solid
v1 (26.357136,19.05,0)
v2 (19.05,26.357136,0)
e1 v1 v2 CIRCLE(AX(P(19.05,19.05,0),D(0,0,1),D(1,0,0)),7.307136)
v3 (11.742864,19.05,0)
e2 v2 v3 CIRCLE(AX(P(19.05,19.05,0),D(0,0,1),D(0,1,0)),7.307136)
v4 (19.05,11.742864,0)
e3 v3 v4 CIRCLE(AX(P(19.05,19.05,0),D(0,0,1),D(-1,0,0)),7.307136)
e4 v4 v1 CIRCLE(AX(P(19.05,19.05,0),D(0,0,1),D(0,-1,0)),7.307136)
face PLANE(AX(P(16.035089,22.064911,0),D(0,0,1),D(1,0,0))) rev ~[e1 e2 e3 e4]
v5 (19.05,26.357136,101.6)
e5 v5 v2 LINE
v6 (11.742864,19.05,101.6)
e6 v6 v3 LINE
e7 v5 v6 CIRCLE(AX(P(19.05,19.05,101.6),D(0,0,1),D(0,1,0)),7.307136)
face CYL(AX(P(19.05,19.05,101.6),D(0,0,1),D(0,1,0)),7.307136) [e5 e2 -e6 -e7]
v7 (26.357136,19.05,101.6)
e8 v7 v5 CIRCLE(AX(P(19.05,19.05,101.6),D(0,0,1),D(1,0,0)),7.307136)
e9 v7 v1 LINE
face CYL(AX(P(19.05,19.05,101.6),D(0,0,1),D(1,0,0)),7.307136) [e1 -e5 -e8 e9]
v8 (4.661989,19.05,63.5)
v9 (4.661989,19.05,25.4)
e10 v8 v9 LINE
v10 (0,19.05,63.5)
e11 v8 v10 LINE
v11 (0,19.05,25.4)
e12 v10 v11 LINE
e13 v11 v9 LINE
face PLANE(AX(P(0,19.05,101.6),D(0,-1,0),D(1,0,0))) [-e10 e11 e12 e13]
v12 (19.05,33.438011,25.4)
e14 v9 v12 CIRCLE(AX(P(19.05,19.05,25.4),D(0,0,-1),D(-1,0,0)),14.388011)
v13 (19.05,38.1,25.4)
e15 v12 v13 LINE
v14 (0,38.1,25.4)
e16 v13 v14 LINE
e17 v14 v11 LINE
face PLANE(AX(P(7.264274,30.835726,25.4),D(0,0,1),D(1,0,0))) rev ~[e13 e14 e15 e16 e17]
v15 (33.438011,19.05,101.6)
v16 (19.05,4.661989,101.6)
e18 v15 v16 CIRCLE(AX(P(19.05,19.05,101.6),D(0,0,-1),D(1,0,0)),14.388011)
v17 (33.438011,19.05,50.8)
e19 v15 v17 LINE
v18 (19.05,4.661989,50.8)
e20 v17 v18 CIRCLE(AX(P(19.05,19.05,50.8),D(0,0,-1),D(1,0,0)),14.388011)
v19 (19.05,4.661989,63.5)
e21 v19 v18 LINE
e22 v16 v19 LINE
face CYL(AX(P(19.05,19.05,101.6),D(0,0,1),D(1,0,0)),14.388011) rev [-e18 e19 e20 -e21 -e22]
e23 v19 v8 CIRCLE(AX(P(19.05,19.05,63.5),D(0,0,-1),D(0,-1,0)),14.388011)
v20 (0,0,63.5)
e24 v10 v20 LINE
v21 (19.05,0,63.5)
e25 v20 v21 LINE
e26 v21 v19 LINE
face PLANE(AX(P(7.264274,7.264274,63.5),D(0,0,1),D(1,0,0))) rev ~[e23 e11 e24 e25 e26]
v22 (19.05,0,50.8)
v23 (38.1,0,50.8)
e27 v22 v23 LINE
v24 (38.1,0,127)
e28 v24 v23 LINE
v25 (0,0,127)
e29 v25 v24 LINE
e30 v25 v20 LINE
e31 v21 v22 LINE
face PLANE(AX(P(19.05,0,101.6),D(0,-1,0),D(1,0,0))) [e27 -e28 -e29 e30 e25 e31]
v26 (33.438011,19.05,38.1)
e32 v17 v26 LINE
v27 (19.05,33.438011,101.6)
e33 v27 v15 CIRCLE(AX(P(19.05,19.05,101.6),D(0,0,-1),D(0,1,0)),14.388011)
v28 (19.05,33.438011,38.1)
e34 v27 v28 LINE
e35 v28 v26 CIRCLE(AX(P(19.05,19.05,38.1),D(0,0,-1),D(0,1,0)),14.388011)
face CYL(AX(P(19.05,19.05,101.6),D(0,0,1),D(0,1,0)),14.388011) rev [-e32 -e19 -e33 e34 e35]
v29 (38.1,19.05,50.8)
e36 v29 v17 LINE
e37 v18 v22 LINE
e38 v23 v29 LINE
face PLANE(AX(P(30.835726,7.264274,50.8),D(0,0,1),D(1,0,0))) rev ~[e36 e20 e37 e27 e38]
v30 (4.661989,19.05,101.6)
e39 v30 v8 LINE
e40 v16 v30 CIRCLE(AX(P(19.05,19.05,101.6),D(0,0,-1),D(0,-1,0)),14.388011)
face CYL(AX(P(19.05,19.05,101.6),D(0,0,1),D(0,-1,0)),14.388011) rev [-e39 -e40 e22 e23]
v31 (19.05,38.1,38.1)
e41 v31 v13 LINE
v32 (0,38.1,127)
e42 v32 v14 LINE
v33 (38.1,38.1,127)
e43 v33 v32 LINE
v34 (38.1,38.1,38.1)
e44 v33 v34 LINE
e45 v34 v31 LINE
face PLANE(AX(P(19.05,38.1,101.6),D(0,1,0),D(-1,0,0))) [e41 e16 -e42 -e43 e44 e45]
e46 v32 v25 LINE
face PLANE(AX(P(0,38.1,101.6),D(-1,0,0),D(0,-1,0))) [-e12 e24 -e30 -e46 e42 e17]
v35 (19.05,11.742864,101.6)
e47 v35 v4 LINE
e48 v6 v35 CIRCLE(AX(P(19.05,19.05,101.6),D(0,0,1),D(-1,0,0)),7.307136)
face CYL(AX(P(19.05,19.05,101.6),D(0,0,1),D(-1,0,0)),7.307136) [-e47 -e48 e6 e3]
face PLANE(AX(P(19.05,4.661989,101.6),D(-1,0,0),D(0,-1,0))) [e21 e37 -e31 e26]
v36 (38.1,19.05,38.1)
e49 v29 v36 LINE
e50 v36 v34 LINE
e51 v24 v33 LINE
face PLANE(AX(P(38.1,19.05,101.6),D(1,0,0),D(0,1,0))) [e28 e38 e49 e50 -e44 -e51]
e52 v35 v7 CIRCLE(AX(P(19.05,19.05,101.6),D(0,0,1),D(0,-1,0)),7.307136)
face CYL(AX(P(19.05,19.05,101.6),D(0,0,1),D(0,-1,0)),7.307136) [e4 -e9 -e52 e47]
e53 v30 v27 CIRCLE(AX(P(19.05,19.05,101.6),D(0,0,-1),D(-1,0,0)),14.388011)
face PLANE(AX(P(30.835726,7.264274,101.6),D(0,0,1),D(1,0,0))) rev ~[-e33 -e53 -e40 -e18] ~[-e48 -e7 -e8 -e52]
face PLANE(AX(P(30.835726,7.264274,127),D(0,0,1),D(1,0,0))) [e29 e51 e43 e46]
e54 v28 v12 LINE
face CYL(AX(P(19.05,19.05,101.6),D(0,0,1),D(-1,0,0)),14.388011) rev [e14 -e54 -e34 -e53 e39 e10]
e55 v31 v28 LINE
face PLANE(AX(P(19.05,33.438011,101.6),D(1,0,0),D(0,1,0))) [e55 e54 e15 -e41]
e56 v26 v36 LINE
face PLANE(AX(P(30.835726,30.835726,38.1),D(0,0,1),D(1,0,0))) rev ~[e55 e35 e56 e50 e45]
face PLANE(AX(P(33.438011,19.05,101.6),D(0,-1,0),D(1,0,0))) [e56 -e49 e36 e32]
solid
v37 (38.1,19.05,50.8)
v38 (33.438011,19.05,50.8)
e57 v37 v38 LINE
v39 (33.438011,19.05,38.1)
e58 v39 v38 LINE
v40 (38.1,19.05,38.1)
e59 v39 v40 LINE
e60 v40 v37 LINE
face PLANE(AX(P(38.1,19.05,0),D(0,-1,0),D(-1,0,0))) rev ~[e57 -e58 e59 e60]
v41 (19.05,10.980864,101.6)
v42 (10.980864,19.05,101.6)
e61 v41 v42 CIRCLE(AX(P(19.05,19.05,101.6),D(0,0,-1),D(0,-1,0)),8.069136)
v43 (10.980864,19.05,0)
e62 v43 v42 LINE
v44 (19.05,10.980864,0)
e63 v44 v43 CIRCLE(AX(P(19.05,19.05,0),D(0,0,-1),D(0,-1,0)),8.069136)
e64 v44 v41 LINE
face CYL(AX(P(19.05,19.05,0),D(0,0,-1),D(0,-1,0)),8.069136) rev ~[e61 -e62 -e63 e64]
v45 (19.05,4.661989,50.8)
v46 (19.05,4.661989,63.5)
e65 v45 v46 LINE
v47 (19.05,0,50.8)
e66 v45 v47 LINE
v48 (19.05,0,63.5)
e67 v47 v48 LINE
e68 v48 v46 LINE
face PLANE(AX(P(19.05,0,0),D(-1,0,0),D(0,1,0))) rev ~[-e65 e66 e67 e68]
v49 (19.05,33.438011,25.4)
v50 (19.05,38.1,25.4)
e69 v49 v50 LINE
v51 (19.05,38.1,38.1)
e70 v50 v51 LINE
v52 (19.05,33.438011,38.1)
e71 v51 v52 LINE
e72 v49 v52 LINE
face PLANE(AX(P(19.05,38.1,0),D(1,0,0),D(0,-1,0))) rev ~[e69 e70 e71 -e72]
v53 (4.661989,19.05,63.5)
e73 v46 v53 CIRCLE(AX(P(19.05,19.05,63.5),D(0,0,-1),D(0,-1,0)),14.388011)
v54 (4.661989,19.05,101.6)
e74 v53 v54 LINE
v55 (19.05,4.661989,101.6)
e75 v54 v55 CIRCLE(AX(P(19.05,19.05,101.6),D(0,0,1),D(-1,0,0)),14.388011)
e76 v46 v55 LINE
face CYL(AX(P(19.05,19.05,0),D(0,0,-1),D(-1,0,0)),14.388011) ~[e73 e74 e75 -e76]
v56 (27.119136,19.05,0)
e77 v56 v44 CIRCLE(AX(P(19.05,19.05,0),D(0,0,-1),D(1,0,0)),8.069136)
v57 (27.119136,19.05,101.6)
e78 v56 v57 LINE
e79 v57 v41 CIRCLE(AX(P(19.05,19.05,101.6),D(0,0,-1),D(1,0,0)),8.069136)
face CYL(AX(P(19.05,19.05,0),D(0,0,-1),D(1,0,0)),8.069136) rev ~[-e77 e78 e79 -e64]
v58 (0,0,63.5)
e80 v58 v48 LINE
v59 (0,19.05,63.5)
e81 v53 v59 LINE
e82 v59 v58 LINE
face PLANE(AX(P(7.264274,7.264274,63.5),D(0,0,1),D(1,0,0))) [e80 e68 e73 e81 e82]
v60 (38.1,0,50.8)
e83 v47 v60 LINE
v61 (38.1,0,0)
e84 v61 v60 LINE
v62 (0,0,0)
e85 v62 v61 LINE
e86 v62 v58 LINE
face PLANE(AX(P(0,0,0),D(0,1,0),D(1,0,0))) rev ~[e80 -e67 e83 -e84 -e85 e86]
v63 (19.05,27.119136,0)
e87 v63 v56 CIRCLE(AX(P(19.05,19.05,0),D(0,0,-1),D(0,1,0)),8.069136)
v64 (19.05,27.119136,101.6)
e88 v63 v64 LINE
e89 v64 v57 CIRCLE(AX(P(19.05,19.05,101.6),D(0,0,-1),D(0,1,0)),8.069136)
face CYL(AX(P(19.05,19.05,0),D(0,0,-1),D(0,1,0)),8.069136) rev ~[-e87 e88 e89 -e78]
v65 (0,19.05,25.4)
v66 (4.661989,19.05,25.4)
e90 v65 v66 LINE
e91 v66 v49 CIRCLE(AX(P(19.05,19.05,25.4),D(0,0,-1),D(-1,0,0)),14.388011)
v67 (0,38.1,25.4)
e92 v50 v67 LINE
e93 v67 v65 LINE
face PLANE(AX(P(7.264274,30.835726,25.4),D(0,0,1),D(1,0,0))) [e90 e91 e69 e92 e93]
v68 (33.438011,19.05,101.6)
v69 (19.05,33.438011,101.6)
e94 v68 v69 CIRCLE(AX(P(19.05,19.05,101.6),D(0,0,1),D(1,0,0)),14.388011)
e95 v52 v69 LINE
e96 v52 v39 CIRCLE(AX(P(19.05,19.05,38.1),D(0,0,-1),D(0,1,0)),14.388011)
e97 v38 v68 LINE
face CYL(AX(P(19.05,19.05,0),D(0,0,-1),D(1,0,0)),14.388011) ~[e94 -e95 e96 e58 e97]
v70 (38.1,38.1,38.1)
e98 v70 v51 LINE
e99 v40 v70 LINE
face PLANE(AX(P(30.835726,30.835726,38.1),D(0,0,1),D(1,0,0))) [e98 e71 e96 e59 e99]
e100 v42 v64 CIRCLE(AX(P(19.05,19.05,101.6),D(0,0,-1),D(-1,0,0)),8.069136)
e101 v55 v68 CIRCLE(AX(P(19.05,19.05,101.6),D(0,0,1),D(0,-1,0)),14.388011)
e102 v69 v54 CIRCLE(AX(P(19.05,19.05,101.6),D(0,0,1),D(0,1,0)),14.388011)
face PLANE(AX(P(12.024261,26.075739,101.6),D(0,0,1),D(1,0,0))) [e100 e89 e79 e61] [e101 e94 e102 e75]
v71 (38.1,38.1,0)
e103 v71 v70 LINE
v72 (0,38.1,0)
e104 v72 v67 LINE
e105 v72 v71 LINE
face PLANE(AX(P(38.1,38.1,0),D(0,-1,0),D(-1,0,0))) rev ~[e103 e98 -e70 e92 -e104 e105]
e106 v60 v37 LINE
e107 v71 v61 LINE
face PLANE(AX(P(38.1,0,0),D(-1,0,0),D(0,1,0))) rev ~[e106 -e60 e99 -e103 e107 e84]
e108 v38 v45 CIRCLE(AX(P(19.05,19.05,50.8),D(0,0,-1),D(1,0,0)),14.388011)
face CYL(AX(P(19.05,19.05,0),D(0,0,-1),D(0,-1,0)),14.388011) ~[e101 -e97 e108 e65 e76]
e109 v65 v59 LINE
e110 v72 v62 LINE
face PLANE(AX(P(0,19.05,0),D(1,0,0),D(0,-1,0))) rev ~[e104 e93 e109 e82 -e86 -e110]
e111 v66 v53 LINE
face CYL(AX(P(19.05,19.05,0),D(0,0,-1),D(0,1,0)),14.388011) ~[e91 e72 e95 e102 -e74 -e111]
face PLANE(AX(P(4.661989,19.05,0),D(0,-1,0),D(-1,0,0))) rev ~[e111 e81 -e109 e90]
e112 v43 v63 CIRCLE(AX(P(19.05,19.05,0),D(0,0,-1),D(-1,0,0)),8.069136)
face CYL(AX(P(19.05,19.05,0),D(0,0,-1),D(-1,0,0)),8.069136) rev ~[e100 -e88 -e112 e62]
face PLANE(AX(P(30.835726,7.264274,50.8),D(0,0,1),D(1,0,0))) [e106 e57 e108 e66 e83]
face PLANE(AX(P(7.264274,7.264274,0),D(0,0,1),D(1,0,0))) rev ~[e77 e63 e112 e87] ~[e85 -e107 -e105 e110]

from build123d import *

# Parameters (mm, degrees)
F1_DEPTH  = 25.4
F2_DEPTH  = 38.1
F3_DEPTH  = 50.8
F4_DEPTH  = 63.5
F5_DEPTH  = 101.6
F7_DEPTH  = 101.6
F8_DEPTH  = 25.4
F9_DEPTH  = 38.1
F10_DEPTH = 50.8
F11_DEPTH = 63.5
F12_DEPTH = 76.2


with BuildPart() as f1:
    # F0 (on Top) → F1 (new body)
    with BuildSketch(Plane.XY):
        with BuildLine():
            Line((0, 38.1), (0, 19.05))
            Line((0, 19.05), (4.6619887504, 19.05))
            ThreePointArc((4.6619887504, 19.05), (8.8761396776, 29.2238603224), (19.05, 33.4380112496))
            Line((19.05, 33.4380112496), (19.05, 38.1))
            Line((19.05, 38.1), (0, 38.1))
        make_face()
    extrude(amount=F1_DEPTH)

    # F0 (on Top) → F2 (join)
    with BuildSketch(Plane.XY):
        with BuildLine():
            Line((33.4380112496, 19.05), (38.1, 19.05))
            Line((38.1, 19.05), (38.1, 38.1))
            Line((38.1, 38.1), (19.05, 38.1))
            Line((19.05, 38.1), (19.05, 33.4380112496))
            ThreePointArc((19.05, 33.4380112496), (29.2238603224, 29.2238603224), (33.4380112496, 19.05))
        make_face()
    extrude(amount=F2_DEPTH)

    # F0 (on Top) → F3 (join)
    with BuildSketch(Plane.XY):
        with BuildLine():
            Line((19.05, 4.6619887504), (19.05, 0))
            Line((19.05, 0), (38.1, 0))
            Line((38.1, 0), (38.1, 19.05))
            Line((38.1, 19.05), (33.4380112496, 19.05))
            ThreePointArc((33.4380112496, 19.05), (29.2238603224, 8.8761396776), (19.05, 4.6619887504))
        make_face()
    extrude(amount=F3_DEPTH)

    # F0 (on Top) → F4 (join)
    with BuildSketch(Plane.XY):
        with BuildLine():
            Line((0, 19.05), (0, 0))
            Line((0, 0), (19.05, 0))
            Line((19.05, 0), (19.05, 4.6619887504))
            ThreePointArc((19.05, 4.6619887504), (8.8761396776, 8.8761396776), (4.6619887504, 19.05))
            Line((4.6619887504, 19.05), (0, 19.05))
        make_face()
    extrude(amount=F4_DEPTH)

    # F0 (on Top) → F5 (join)
    with BuildSketch(Plane.XY):
        with BuildLine():
            ThreePointArc((19.05, 33.4380112496), (8.8761396776, 29.2238603224), (4.6619887504, 19.05))
            Line((4.6619887504, 19.05), (10.9808641353, 19.05))
            ThreePointArc((10.9808641353, 19.05), (13.3442593118, 24.7557406882), (19.05, 27.1191358647))
            Line((19.05, 27.1191358647), (19.05, 33.4380112496))
        make_face()
        with BuildLine():
            Line((27.1191358647, 19.05), (33.4380112496, 19.05))
            ThreePointArc((33.4380112496, 19.05), (29.2238603224, 29.2238603224), (19.05, 33.4380112496))
            Line((19.05, 33.4380112496), (19.05, 27.1191358647))
            ThreePointArc((19.05, 27.1191358647), (24.7557406882, 24.7557406882), (27.1191358647, 19.05))
        make_face()
        with BuildLine():
            Line((19.05, 10.9808641353), (19.05, 4.6619887504))
            ThreePointArc((19.05, 4.6619887504), (29.2238603224, 8.8761396776), (33.4380112496, 19.05))
            Line((33.4380112496, 19.05), (27.1191358647, 19.05))
            ThreePointArc((27.1191358647, 19.05), (24.7557406882, 13.3442593118), (19.05, 10.9808641353))
        make_face()
        with BuildLine():
            ThreePointArc((4.6619887504, 19.05), (8.8761396776, 8.8761396776), (19.05, 4.6619887504))
            Line((19.05, 4.6619887504), (19.05, 10.9808641353))
            ThreePointArc((19.05, 10.9808641353), (13.3442593118, 13.3442593118), (10.9808641353, 19.05))
            Line((10.9808641353, 19.05), (4.6619887504, 19.05))
        make_face()
    extrude(amount=F5_DEPTH)


with BuildPart() as f7:
    # F6 (on face) → F7 (new body, through all)
    with BuildSketch(Plane.XY.offset(101.6)):
        with BuildLine():
            Line((19.05, 19.05), (19.05, 26.3571361959))
            ThreePointArc((19.05, 26.3571361959), (13.8830744448, 24.2169255552), (11.7428638041, 19.05))
            Line((11.7428638041, 19.05), (19.05, 19.05))
        make_face()
        with BuildLine():
            Line((19.05, 19.05), (26.3571361959, 19.05))
            ThreePointArc((26.3571361959, 19.05), (24.2169255552, 24.2169255552), (19.05, 26.3571361959))
            Line((19.05, 26.3571361959), (19.05, 19.05))
        make_face()
        with BuildLine():
            ThreePointArc((11.7428638041, 19.05), (13.8830744448, 13.8830744448), (19.05, 11.7428638041))
            Line((19.05, 11.7428638041), (19.05, 19.05))
            Line((19.05, 19.05), (11.7428638041, 19.05))
        make_face()
        with BuildLine():
            ThreePointArc((19.05, 11.7428638041), (24.2169255552, 13.8830744448), (26.3571361959, 19.05))
            Line((26.3571361959, 19.05), (19.05, 19.05))
            Line((19.05, 19.05), (19.05, 11.7428638041))
        make_face()
    extrude(amount=-F7_DEPTH)

    # F6 (on face) → F8 (join)
    with BuildSketch(Plane.XY.offset(101.6)):
        with BuildLine():
            Line((38.1, 19.05), (33.4380112496, 19.05))
            ThreePointArc((33.4380112496, 19.05), (29.2238603224, 8.8761396776), (19.05, 4.6619887504))
            Line((19.05, 4.6619887504), (19.05, 0))
            Line((19.05, 0), (38.1, 0))
            Line((38.1, 0), (38.1, 19.05))
        make_face()
        with BuildLine():
            ThreePointArc((19.05, 4.6619887504), (29.2238603224, 8.8761396776), (33.4380112496, 19.05))
            Line((33.4380112496, 19.05), (27.1191358647, 19.05))
            ThreePointArc((27.1191358647, 19.05), (24.7557406882, 13.3442593118), (19.05, 10.9808641353))
            Line((19.05, 10.9808641353), (19.05, 4.6619887504))
        make_face()
        with BuildLine():
            ThreePointArc((19.05, 10.9808641353), (24.7557406882, 13.3442593118), (27.1191358647, 19.05))
            Line((27.1191358647, 19.05), (26.3571361959, 19.05))
            ThreePointArc((26.3571361959, 19.05), (24.2169255552, 13.8830744448), (19.05, 11.7428638041))
            Line((19.05, 11.7428638041), (19.05, 10.9808641353))
        make_face()
        with BuildLine():
            ThreePointArc((19.05, 11.7428638041), (24.2169255552, 13.8830744448), (26.3571361959, 19.05))
            Line((26.3571361959, 19.05), (19.05, 19.05))
            Line((19.05, 19.05), (19.05, 11.7428638041))
        make_face()
        with BuildLine():
            ThreePointArc((11.7428638041, 19.05), (13.8830744448, 13.8830744448), (19.05, 11.7428638041))
            Line((19.05, 11.7428638041), (19.05, 19.05))
            Line((19.05, 19.05), (11.7428638041, 19.05))
        make_face()
        with BuildLine():
            ThreePointArc((10.9808641353, 19.05), (13.3442593118, 13.3442593118), (19.05, 10.9808641353))
            Line((19.05, 10.9808641353), (19.05, 11.7428638041))
            ThreePointArc((19.05, 11.7428638041), (13.8830744448, 13.8830744448), (11.7428638041, 19.05))
            Line((11.7428638041, 19.05), (10.9808641353, 19.05))
        make_face()
        with BuildLine():
            ThreePointArc((4.6619887504, 19.05), (8.8761396776, 8.8761396776), (19.05, 4.6619887504))
            Line((19.05, 4.6619887504), (19.05, 10.9808641353))
            ThreePointArc((19.05, 10.9808641353), (13.3442593118, 13.3442593118), (10.9808641353, 19.05))
            Line((10.9808641353, 19.05), (4.6619887504, 19.05))
        make_face()
        with BuildLine():
            Line((19.05, 0), (19.05, 4.6619887504))
            ThreePointArc((19.05, 4.6619887504), (8.8761396776, 8.8761396776), (4.6619887504, 19.05))
            Line((4.6619887504, 19.05), (0, 19.05))
            Line((0, 19.05), (0, 0))
            Line((0, 0), (19.05, 0))
        make_face()
        with BuildLine():
            Line((19.05, 19.05), (19.05, 26.3571361959))
            ThreePointArc((19.05, 26.3571361959), (13.8830744448, 24.2169255552), (11.7428638041, 19.05))
            Line((11.7428638041, 19.05), (19.05, 19.05))
        make_face()
        with BuildLine():
            Line((19.05, 26.3571361959), (19.05, 27.1191358647))
            ThreePointArc((19.05, 27.1191358647), (13.3442593118, 24.7557406882), (10.9808641353, 19.05))
            Line((10.9808641353, 19.05), (11.7428638041, 19.05))
            ThreePointArc((11.7428638041, 19.05), (13.8830744448, 24.2169255552), (19.05, 26.3571361959))
        make_face()
        with BuildLine():
            Line((19.05, 27.1191358647), (19.05, 33.4380112496))
            ThreePointArc((19.05, 33.4380112496), (8.8761396776, 29.2238603224), (4.6619887504, 19.05))
            Line((4.6619887504, 19.05), (10.9808641353, 19.05))
            ThreePointArc((10.9808641353, 19.05), (13.3442593118, 24.7557406882), (19.05, 27.1191358647))
        make_face()
        with BuildLine():
            ThreePointArc((4.6619887504, 19.05), (8.8761396776, 29.2238603224), (19.05, 33.4380112496))
            Line((19.05, 33.4380112496), (19.05, 38.1))
            Line((19.05, 38.1), (0, 38.1))
            Line((0, 38.1), (0, 19.05))
            Line((0, 19.05), (4.6619887504, 19.05))
        make_face()
        with BuildLine():
            Line((19.05, 19.05), (26.3571361959, 19.05))
            ThreePointArc((26.3571361959, 19.05), (24.2169255552, 24.2169255552), (19.05, 26.3571361959))
            Line((19.05, 26.3571361959), (19.05, 19.05))
        make_face()
        with BuildLine():
            Line((26.3571361959, 19.05), (27.1191358647, 19.05))
            ThreePointArc((27.1191358647, 19.05), (24.7557406882, 24.7557406882), (19.05, 27.1191358647))
            Line((19.05, 27.1191358647), (19.05, 26.3571361959))
            ThreePointArc((19.05, 26.3571361959), (24.2169255552, 24.2169255552), (26.3571361959, 19.05))
        make_face()
        with BuildLine():
            Line((27.1191358647, 19.05), (33.4380112496, 19.05))
            ThreePointArc((33.4380112496, 19.05), (29.2238603224, 29.2238603224), (19.05, 33.4380112496))
            Line((19.05, 33.4380112496), (19.05, 27.1191358647))
            ThreePointArc((19.05, 27.1191358647), (24.7557406882, 24.7557406882), (27.1191358647, 19.05))
        make_face()
        with BuildLine():
            ThreePointArc((19.05, 33.4380112496), (29.2238603224, 29.2238603224), (33.4380112496, 19.05))
            Line((33.4380112496, 19.05), (38.1, 19.05))
            Line((38.1, 19.05), (38.1, 38.1))
            Line((38.1, 38.1), (19.05, 38.1))
            Line((19.05, 38.1), (19.05, 33.4380112496))
        make_face()
    extrude(amount=F8_DEPTH)

    # F6 (on face) → F9 (join, through all)
    with BuildSketch(Plane.XY.offset(101.6)):
        with BuildLine():
            Line((19.05, 0), (19.05, 4.6619887504))
            ThreePointArc((19.05, 4.6619887504), (8.8761396776, 8.8761396776), (4.6619887504, 19.05))
            Line((4.6619887504, 19.05), (0, 19.05))
            Line((0, 19.05), (0, 0))
            Line((0, 0), (19.05, 0))
        make_face()
    extrude(amount=-F9_DEPTH)

    # F6 (on face) → F10 (join, through all)
    with BuildSketch(Plane.XY.offset(101.6)):
        with BuildLine():
            Line((38.1, 19.05), (33.4380112496, 19.05))
            ThreePointArc((33.4380112496, 19.05), (29.2238603224, 8.8761396776), (19.05, 4.6619887504))
            Line((19.05, 4.6619887504), (19.05, 0))
            Line((19.05, 0), (38.1, 0))
            Line((38.1, 0), (38.1, 19.05))
        make_face()
    extrude(amount=-F10_DEPTH)

    # F6 (on face) → F11 (join, through all)
    with BuildSketch(Plane.XY.offset(101.6)):
        with BuildLine():
            ThreePointArc((19.05, 33.4380112496), (29.2238603224, 29.2238603224), (33.4380112496, 19.05))
            Line((33.4380112496, 19.05), (38.1, 19.05))
            Line((38.1, 19.05), (38.1, 38.1))
            Line((38.1, 38.1), (19.05, 38.1))
            Line((19.05, 38.1), (19.05, 33.4380112496))
        make_face()
    extrude(amount=-F11_DEPTH)

    # F6 (on face) → F12 (join, through all)
    with BuildSketch(Plane.XY.offset(101.6)):
        with BuildLine():
            ThreePointArc((4.6619887504, 19.05), (8.8761396776, 29.2238603224), (19.05, 33.4380112496))
            Line((19.05, 33.4380112496), (19.05, 38.1))
            Line((19.05, 38.1), (0, 38.1))
            Line((0, 38.1), (0, 19.05))
            Line((0, 19.05), (4.6619887504, 19.05))
        make_face()
    extrude(amount=-F12_DEPTH)


solid = Compound([f1.part, f7.part])
